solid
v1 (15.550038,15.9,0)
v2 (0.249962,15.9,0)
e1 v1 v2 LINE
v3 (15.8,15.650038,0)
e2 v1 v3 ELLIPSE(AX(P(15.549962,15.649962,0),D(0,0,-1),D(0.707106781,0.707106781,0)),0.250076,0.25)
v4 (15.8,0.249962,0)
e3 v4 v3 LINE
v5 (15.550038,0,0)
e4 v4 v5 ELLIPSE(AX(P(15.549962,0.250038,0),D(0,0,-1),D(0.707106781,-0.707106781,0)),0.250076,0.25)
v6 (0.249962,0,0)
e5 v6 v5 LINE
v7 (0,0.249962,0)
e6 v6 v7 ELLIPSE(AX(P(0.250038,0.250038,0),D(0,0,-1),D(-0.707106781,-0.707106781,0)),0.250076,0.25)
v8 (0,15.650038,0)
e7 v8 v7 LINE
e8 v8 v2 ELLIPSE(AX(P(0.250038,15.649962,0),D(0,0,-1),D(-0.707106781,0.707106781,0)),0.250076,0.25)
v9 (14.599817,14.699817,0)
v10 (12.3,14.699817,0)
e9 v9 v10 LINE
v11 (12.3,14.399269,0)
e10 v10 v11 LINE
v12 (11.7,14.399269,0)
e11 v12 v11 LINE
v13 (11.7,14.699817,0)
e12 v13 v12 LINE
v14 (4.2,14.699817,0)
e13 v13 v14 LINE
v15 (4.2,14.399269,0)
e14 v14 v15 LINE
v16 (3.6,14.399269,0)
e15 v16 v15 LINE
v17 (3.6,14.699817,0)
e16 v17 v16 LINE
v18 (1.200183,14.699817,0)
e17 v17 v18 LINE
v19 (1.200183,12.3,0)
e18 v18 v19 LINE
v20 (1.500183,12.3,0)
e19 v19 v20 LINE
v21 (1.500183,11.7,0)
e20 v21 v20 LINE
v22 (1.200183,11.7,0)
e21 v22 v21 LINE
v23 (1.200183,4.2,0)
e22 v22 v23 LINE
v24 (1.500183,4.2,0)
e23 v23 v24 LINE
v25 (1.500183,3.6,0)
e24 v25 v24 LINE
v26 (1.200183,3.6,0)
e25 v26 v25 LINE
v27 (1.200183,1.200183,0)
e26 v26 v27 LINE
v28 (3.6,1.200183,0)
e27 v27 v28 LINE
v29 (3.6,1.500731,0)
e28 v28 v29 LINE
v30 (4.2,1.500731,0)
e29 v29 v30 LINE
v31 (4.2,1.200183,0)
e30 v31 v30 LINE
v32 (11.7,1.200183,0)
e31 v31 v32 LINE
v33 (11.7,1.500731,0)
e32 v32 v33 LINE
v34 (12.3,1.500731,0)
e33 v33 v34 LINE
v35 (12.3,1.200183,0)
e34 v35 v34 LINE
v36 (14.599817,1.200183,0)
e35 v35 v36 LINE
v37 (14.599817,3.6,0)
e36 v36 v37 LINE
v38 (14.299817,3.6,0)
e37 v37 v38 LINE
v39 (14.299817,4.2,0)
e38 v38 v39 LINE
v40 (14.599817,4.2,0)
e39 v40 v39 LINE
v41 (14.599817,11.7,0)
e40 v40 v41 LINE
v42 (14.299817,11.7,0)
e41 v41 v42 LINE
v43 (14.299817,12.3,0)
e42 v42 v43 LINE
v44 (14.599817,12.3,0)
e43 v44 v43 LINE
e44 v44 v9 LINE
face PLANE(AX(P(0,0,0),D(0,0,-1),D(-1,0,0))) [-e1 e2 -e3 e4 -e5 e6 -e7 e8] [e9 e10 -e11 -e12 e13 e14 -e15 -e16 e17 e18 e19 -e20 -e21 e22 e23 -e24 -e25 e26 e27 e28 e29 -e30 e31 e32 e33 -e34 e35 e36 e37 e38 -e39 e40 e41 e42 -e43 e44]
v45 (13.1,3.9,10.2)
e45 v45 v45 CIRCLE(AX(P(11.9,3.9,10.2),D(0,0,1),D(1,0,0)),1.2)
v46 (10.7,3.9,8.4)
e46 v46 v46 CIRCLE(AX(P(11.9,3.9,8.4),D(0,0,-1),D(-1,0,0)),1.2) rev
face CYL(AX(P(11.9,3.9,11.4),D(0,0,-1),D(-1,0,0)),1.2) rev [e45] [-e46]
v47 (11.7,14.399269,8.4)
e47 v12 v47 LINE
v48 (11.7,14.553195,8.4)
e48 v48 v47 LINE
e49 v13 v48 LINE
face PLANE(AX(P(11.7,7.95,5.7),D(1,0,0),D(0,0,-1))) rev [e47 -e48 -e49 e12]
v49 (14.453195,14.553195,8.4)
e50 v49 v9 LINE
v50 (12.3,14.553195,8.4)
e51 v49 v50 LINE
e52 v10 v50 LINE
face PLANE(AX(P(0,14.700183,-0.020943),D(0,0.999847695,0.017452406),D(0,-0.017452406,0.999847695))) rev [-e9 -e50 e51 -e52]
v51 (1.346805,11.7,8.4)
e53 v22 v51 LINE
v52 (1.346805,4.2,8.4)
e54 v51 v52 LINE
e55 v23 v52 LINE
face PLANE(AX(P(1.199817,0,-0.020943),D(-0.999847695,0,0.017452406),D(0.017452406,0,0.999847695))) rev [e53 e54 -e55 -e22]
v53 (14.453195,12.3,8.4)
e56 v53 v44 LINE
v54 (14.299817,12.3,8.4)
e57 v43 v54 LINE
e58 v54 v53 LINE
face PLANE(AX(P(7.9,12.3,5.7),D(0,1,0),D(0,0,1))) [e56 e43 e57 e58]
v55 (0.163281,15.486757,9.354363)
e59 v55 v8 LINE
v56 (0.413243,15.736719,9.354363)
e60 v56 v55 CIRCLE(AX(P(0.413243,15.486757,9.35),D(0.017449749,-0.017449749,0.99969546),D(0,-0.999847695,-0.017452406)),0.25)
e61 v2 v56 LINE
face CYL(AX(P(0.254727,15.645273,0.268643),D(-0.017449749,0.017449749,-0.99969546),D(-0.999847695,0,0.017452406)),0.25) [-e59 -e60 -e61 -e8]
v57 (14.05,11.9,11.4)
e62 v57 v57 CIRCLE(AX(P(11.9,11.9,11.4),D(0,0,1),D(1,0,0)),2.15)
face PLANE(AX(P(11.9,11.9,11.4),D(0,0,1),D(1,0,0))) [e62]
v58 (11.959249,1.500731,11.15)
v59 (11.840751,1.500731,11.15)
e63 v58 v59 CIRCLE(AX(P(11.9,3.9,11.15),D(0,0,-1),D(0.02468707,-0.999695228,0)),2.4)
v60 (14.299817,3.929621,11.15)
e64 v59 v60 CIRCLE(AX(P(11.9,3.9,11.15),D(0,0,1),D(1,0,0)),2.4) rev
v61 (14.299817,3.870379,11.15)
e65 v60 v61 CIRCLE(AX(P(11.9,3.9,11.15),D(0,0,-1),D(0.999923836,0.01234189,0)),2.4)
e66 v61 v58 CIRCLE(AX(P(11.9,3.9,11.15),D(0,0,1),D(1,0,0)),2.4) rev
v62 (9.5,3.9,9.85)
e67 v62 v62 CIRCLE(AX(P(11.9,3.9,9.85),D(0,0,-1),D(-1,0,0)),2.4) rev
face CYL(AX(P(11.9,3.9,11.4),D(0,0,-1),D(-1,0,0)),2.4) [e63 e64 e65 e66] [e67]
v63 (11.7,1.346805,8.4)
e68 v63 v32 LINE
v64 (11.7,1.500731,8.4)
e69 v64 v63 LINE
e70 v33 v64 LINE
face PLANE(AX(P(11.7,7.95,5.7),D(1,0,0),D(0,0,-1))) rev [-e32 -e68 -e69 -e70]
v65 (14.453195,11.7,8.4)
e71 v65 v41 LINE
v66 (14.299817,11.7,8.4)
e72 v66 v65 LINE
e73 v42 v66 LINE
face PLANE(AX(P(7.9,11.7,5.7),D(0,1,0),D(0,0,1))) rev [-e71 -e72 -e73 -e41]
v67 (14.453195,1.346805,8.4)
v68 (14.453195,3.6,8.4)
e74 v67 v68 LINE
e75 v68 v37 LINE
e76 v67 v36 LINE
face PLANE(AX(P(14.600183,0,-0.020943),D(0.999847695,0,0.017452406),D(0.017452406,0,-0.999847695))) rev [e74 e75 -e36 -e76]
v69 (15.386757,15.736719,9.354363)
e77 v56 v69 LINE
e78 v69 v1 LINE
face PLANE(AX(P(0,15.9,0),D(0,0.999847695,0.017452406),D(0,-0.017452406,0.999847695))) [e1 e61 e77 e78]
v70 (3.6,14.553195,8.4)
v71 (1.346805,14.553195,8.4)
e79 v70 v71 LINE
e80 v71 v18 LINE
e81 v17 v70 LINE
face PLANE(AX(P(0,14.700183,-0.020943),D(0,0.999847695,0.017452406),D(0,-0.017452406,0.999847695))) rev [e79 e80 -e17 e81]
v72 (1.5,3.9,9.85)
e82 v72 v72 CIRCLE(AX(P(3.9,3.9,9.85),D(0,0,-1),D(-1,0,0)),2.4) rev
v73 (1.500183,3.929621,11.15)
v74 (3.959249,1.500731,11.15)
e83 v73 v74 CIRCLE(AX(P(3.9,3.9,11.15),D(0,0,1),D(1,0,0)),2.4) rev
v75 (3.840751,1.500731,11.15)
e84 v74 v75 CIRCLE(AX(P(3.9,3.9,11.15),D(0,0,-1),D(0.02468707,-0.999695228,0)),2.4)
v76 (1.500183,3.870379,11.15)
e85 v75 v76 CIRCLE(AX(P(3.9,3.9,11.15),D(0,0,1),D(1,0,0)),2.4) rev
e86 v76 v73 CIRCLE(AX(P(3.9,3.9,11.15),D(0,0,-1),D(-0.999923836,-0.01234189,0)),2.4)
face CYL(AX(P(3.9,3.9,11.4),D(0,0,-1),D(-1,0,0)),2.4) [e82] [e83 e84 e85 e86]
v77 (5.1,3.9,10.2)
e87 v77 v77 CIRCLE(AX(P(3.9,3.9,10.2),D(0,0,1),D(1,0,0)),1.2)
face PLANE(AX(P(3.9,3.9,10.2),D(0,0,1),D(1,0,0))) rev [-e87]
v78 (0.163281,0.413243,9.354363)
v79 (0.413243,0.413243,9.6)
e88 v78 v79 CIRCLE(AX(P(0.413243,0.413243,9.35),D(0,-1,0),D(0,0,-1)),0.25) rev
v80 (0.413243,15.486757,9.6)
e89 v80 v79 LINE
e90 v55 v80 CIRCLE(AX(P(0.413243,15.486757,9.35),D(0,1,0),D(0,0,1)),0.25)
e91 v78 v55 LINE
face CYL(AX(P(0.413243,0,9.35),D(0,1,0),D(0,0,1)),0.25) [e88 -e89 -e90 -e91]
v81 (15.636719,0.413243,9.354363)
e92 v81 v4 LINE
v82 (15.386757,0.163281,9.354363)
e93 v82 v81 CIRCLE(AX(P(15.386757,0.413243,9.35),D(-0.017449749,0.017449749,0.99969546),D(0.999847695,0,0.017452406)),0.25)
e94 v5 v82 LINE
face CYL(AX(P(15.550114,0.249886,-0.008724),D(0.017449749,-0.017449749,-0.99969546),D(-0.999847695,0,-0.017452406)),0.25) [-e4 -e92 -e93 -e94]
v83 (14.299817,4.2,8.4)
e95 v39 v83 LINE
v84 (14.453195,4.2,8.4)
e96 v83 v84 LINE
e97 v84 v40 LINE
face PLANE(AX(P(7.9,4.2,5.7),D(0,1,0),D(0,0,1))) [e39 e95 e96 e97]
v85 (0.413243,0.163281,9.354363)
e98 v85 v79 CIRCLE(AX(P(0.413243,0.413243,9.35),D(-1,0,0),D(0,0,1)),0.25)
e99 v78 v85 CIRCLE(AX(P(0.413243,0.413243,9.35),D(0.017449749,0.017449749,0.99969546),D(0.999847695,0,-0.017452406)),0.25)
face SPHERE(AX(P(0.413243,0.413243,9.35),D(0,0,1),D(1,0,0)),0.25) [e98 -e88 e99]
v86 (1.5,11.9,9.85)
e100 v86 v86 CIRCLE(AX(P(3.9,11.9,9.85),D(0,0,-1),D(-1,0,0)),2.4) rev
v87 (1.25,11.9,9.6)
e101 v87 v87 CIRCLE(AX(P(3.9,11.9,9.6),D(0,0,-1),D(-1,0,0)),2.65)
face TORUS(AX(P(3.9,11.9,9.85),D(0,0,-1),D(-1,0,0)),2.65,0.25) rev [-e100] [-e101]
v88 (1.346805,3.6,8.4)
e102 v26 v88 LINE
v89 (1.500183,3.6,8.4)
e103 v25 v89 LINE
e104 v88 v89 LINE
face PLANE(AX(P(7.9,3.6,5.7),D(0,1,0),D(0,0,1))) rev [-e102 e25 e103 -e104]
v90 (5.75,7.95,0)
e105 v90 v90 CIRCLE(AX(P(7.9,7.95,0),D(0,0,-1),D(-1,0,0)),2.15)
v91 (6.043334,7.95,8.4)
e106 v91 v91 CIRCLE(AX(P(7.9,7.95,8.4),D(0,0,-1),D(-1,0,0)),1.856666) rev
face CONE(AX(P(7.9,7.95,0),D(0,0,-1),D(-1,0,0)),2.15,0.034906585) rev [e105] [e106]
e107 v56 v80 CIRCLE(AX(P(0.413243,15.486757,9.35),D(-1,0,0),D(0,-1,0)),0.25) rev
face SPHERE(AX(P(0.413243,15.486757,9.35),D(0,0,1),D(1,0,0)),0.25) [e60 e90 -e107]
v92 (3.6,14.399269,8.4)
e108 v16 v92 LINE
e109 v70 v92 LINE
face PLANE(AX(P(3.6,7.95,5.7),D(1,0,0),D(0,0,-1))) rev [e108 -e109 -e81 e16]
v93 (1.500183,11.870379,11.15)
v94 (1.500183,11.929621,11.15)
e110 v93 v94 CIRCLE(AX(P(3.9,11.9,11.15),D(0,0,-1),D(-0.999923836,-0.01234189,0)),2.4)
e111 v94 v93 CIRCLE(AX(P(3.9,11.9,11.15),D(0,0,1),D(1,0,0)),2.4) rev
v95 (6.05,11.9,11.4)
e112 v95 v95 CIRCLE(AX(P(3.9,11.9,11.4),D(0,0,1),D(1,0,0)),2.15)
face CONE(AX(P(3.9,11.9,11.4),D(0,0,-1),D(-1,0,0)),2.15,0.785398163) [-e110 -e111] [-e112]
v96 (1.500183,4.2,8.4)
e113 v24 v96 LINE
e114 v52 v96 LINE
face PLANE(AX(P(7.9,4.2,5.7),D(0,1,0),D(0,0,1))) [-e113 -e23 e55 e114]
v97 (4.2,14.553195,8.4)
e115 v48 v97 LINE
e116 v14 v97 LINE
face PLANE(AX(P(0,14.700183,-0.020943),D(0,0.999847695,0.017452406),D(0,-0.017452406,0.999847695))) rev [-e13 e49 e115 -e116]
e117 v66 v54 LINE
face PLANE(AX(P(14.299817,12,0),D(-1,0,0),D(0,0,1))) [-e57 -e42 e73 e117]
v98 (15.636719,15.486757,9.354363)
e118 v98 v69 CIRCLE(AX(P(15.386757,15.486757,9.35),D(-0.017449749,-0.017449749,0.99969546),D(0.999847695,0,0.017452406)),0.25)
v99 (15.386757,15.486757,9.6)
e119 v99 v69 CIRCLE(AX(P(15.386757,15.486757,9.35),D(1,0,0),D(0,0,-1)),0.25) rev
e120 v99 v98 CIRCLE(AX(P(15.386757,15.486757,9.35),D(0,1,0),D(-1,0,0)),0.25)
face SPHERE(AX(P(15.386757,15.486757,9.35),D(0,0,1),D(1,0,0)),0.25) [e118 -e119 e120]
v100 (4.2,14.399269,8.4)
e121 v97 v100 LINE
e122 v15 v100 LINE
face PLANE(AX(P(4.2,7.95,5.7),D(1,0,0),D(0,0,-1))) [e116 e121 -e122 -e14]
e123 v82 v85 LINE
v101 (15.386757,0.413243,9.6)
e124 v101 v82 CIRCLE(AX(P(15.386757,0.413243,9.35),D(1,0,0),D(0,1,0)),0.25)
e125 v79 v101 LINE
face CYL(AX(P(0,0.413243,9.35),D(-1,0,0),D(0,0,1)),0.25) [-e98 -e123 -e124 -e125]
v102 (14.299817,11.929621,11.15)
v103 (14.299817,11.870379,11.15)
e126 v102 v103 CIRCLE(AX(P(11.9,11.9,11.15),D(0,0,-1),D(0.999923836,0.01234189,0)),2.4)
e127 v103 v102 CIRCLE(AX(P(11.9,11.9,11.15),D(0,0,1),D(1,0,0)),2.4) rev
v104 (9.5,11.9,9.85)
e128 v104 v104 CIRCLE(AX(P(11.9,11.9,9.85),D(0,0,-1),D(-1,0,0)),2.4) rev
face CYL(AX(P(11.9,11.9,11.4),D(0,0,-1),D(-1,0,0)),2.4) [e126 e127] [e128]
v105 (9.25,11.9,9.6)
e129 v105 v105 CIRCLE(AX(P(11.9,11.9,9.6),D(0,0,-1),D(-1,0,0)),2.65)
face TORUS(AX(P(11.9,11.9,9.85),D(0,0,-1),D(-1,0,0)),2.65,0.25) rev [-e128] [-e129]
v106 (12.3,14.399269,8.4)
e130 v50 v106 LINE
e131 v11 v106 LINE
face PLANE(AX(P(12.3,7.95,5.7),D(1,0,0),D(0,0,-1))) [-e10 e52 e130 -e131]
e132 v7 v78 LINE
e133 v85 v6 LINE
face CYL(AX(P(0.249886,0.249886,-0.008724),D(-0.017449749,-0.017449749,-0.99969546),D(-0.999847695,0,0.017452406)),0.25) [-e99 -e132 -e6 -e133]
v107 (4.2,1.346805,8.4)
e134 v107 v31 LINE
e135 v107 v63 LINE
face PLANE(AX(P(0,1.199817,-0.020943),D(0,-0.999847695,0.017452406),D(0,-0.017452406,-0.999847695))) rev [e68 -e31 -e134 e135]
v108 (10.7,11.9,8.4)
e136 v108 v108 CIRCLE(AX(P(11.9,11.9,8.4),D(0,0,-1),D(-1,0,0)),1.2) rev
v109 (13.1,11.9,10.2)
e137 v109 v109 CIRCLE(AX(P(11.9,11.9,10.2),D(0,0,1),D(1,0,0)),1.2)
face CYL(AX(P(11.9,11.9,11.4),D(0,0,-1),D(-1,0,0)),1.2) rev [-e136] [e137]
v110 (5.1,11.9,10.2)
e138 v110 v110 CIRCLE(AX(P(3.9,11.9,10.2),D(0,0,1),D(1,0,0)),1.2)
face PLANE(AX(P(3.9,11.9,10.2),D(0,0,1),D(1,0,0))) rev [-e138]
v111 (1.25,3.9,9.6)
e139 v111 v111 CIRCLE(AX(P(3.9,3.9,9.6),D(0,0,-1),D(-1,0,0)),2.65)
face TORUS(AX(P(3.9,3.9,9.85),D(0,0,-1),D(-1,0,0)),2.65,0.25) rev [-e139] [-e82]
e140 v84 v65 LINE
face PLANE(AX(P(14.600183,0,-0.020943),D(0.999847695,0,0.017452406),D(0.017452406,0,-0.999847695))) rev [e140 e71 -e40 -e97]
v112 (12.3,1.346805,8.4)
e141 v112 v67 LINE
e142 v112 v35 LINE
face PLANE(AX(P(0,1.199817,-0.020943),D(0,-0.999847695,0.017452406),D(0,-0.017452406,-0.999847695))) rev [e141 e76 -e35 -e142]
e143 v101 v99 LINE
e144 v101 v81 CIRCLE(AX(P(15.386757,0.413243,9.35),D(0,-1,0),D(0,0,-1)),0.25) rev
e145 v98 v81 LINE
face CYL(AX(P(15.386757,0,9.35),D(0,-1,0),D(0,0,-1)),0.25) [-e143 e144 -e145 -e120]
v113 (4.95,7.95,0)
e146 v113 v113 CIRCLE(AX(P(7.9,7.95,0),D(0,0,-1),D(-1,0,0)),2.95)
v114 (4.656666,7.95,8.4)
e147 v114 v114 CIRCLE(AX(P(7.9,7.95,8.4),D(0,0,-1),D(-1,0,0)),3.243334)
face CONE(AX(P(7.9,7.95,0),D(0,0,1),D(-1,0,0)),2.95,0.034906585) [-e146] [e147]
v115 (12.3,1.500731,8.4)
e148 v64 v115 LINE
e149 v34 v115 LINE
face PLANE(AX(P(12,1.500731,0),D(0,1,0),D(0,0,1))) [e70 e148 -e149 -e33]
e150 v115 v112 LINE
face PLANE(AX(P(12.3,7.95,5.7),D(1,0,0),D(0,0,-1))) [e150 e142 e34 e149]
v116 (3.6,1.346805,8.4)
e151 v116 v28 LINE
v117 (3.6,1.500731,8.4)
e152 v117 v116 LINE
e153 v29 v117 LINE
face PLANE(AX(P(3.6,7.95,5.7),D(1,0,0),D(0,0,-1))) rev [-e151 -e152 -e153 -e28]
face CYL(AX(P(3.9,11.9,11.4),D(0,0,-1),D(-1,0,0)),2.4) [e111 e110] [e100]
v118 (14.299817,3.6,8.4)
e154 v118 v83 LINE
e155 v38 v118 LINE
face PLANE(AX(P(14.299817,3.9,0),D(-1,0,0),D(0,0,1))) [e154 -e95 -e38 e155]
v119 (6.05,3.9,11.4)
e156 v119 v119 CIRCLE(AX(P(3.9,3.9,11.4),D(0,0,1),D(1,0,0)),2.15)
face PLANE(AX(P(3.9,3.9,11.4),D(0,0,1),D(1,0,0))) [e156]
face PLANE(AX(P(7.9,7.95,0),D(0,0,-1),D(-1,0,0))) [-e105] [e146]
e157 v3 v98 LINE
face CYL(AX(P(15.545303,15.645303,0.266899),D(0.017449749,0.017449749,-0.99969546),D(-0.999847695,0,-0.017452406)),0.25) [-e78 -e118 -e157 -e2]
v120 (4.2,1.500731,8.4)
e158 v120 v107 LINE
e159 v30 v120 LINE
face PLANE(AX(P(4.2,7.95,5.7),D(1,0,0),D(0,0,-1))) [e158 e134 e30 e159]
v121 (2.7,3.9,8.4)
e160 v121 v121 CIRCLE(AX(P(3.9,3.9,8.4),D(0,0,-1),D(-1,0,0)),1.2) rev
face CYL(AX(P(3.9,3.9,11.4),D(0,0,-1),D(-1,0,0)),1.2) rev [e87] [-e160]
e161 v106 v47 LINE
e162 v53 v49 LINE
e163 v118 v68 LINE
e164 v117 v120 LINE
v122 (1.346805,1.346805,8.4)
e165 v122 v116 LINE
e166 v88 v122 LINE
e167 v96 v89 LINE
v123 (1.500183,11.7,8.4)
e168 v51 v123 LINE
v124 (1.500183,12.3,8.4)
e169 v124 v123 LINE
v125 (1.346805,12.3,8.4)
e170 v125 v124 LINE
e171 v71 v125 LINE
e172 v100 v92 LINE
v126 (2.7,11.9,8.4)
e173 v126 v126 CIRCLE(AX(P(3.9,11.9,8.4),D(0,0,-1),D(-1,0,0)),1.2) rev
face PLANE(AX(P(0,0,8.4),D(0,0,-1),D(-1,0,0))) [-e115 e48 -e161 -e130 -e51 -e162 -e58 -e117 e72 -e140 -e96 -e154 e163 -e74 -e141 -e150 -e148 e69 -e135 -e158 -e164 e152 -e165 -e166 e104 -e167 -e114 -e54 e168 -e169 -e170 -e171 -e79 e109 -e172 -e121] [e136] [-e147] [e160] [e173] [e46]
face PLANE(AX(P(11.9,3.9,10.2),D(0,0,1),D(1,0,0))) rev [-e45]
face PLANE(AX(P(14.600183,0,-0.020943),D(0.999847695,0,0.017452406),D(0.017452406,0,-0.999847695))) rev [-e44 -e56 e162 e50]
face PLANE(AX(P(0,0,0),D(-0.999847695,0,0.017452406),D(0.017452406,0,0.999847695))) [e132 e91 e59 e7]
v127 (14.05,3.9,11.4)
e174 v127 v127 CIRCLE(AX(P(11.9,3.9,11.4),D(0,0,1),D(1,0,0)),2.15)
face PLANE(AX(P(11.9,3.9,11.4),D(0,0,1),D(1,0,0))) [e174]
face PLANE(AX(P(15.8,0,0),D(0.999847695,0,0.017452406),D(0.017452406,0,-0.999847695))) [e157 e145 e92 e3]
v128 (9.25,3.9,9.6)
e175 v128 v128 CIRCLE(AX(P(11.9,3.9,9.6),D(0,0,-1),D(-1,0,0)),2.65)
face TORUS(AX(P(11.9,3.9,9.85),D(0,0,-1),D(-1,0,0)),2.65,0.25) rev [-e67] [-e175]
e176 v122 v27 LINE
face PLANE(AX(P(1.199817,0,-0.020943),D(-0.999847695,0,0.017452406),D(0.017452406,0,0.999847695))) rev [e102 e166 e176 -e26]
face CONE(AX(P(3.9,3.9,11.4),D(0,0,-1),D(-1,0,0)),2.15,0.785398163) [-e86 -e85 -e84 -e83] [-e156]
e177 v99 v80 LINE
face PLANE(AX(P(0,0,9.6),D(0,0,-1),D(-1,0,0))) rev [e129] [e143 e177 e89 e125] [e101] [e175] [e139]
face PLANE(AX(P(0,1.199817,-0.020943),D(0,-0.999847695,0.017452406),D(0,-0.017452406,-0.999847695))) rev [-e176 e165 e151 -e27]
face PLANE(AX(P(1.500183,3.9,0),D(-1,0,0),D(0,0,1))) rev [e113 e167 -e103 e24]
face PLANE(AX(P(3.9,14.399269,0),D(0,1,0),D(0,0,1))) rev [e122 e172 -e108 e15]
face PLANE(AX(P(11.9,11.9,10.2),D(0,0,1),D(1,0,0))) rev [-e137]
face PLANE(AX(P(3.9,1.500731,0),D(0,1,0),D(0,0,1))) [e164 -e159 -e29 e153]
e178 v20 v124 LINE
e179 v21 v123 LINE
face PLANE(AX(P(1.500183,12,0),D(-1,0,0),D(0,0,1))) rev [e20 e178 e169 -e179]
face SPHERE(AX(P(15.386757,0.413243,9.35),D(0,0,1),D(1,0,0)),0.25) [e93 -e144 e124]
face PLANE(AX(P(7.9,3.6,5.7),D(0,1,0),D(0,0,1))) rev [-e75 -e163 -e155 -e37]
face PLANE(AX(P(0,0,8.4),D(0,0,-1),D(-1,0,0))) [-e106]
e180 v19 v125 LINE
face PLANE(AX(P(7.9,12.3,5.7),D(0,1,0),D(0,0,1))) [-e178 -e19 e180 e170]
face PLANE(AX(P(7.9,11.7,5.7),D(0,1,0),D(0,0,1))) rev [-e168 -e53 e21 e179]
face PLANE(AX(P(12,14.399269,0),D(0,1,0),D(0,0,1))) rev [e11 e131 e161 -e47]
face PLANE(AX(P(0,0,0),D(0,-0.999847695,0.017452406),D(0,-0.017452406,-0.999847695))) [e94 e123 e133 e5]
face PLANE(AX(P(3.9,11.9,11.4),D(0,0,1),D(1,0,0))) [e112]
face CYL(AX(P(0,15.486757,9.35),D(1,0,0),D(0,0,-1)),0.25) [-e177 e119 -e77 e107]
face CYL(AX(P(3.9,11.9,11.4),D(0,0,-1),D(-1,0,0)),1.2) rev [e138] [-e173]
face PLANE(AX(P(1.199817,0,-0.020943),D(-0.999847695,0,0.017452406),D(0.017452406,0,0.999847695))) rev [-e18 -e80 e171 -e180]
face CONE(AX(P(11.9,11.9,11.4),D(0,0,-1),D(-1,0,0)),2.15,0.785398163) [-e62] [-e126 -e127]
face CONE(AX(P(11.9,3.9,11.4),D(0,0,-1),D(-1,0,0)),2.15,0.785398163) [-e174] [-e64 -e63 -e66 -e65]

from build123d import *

# Parameters (mm, degrees)
SKETCH1_W                  = 15.8
SKETCH1_H                  = 15.9
BOSS_EXTRUDE1_DEPTH        = 9.6
BOSS_EXTRUDE1_TAPER        = 1
SKETCH2_R                  = 2.4
BOSS_EXTRUDE2_DEPTH        = 1.8
CHAMFER1_SIZE              = 0.25
LPATTERN1_COUNT            = 2
LPATTERN1_PITCH            = 8
LPATTERN1_COUNT_DIR2       = 2
LPATTERN1_PITCH_DIR2       = 8
CHAMFER1_OF_LPATTERN1_SIZE = 0.25
SHELL1_OUTLINE_R           = 1.2
SHELL1_DEPTH               = 10.2
FILLET1_R                  = 0.25
RIB2_START                 = -0.3
RIB2_DEPTH                 = 0.6
RIB3_START                 = -0.3
RIB3_DEPTH                 = 0.6
LPATTERN2_COUNT            = 2
LPATTERN2_PITCH            = 8.1
LPATTERN3_COUNT            = 2
LPATTERN3_PITCH            = 8.1
MIRROR1_START              = -0.3
MIRROR1_COPY_1_DEPTH       = 0.6
MIRROR2_START              = -0.3
MIRROR2_COPY_1_DEPTH       = 0.6
SKETCH5_R                  = 2.95
SKETCH5_R_2                = 2.15
BOSS_EXTRUDE3_DEPTH        = 8.4
BOSS_EXTRUDE3_DRAFT        = 2


with BuildPart() as part:
    # Sketch1 → Boss-Extrude1 (new body)
    with BuildSketch(Plane.XY):
        with Locations((7.9, 7.95)):
            Rectangle(SKETCH1_W, SKETCH1_H)
    extrude(amount=BOSS_EXTRUDE1_DEPTH, taper=BOSS_EXTRUDE1_TAPER)

    # Sketch2 → Boss-Extrude2 (add)
    with BuildSketch(Plane.XY.offset(9.6)):
        with Locations(Location((3.9, 3.9, 0), (0, 0, 180))):
            Circle(SKETCH2_R)
    boss_extrude2 = extrude(amount=BOSS_EXTRUDE2_DEPTH)

    # Chamfer1
    chamfer1_edges = [part.edges().sort_by_distance(p)[0] for p in [
        (6.3, 3.9, 11.4),
    ]]
    chamfer(chamfer1_edges, length=CHAMFER1_SIZE)

    # LPattern1: Boss-Extrude2 2 × 2
    with Locations(*[(j * LPATTERN1_PITCH_DIR2, i * LPATTERN1_PITCH, 0) for i in range(LPATTERN1_COUNT) for j in range(LPATTERN1_COUNT_DIR2) if (i, j) != (0, 0)]):
        add(boss_extrude2)

    # Chamfer1 of LPattern1
    chamfer1_of_lpattern1_edges = [part.edges().sort_by_distance(p)[0] for p in [
        (14.3, 3.9, 11.4),
        (6.3, 11.9, 11.4),
        (14.3, 11.9, 11.4),
    ]]
    chamfer(chamfer1_of_lpattern1_edges, length=CHAMFER1_OF_LPATTERN1_SIZE)

    # Shell1: read off the stored shape, not the designer's step
    # Shell1 outline → Shell1 (cut)
    with BuildSketch(Plane.XY):
        with Locations((11.9, 11.9)):
            Circle(SHELL1_OUTLINE_R)
        with Locations((11.9, 3.9)):
            Circle(SHELL1_OUTLINE_R)
        with Locations((3.9, 3.9)):
            Circle(SHELL1_OUTLINE_R)
        with Locations((3.9, 11.9)):
            Circle(SHELL1_OUTLINE_R)
    extrude(amount=SHELL1_DEPTH, mode=Mode.SUBTRACT)

    # Shell1 2: loft between two sections, ruled curve by curve
    shell1_2_from = [
        Edge.make_line((1.346805339, 14.553194661, 8.4), (1.346805339, 1.346805339, 8.4)),
        Edge.make_line((1.346805339, 1.346805339, 8.4), (14.453194661, 1.346805339, 8.4)),
        Edge.make_line((14.453194661, 1.346805339, 8.4), (14.453194661, 14.553194661, 8.4)),
        Edge.make_line((14.453194661, 14.553194661, 8.4), (1.346805339, 14.553194661, 8.4)),
    ]
    shell1_2_to = [
        Edge.make_line((1.200182794, 14.699817206, 0), (1.200182794, 1.200182794, 0)),
        Edge.make_line((1.200182794, 1.200182794, 0), (14.599817206, 1.200182794, 0)),
        Edge.make_line((14.599817206, 1.200182794, 0), (14.599817206, 14.699817206, 0)),
        Edge.make_line((14.599817206, 14.699817206, 0), (1.200182794, 14.699817206, 0)),
    ]
    shell1_2 = Solid(Shell([*[Face.make_surface_from_curves(shell1_2_from[k], shell1_2_to[k]) for k in range(4)], Face(Wire(shell1_2_from)), Face(Wire(shell1_2_to))]))
    add(shell1_2, mode=Mode.SUBTRACT)

    # Fillet1
    fillet1_edges = [part.edges().sort_by_distance(p)[0] for p in [
        (15.632431377, 7.95, 9.6),
        (6.3, 3.9, 9.6),
        (7.9, 15.732431377, 9.6),
        (6.3, 11.9, 9.6),
        (14.3, 3.9, 9.6),
        (14.3, 11.9, 9.6),
        (0.167568623, 7.95, 9.6),
        (0.083784312, 15.816215688, 4.8),
        (15.716215688, 15.816215688, 4.8),
        (15.716215688, 0.083784312, 4.8),
        (0.083784312, 0.083784312, 4.8),
        (7.9, 0.167568623, 9.6),
    ]]
    fillet(fillet1_edges, radius=FILLET1_R)

    # Rib2: read off the stored shape, not the designer's step
    # Rib2 outline → Rib2 (add)
    with BuildSketch(Plane(origin=(0, 3.9, 0), x_dir=(1, 0, 0), z_dir=(0, 1, 0)).offset(RIB2_START)):
        Polygon((14.599817206, 0), (14.299817206, 0), (14.299817206, -8.4), (14.453194661, -8.4), align=None)
    rib2 = extrude(amount=RIB2_DEPTH)

    # Rib3: read off the stored shape, not the designer's step
    # Rib3 outline → Rib3 (add)
    with BuildSketch(Plane(origin=(3.9, 0, 0), x_dir=(0, 0, -1), z_dir=(1, 0, 0)).offset(RIB3_START)):
        Polygon((0, 1.200182794), (0, 1.500731453), (-8.4, 1.500731453), (-8.4, 1.346805339), align=None)
    rib3 = extrude(amount=RIB3_DEPTH)

    # LPattern2: Rib2 ×2
    with Locations(*[(0, i * LPATTERN2_PITCH, 0) for i in range(1, LPATTERN2_COUNT)]):
        add(rib2)

    # LPattern3: Rib3 ×2
    with Locations(*[(i * LPATTERN3_PITCH, 0, 0) for i in range(1, LPATTERN3_COUNT)]):
        add(rib3)

    # Mirror1: Rib3 across plane
    add(rib3.mirror(Plane.ZX.offset(7.95)))

    # Mirror1 copy 1 sketch → Mirror1 copy 1 (add)
    with BuildSketch(Plane(origin=(12, 15.9, 0), x_dir=(0, 0, -1), z_dir=(1, 0, 0)).offset(MIRROR1_START)):
        Polygon((0, -1.200182794), (0, -1.500731453), (-8.4, -1.500731453), (-8.4, -1.346805339), align=None)
    extrude(amount=MIRROR1_COPY_1_DEPTH)

    # Mirror2: Rib2 across plane
    add(rib2.mirror(Plane(origin=(7.9, 0, 0), x_dir=(0, 0, 1), z_dir=(1, 0, 0))))

    # Mirror2 copy 1 sketch → Mirror2 copy 1 (add)
    with BuildSketch(Plane(origin=(15.8, 12, 0), x_dir=(-1, 0, 0), z_dir=(0, 1, 0)).offset(MIRROR2_START)):
        Polygon((14.599817206, 0), (14.299817206, 0), (14.299817206, 8.4), (14.453194661, 8.4), align=None)
    extrude(amount=MIRROR2_COPY_1_DEPTH)


with BuildPart() as boss_extrude3_tool:
    # Sketch5 → Boss-Extrude3 (with draft: the straight prism first)
    with BuildSketch(Plane(origin=(0, 0, 0), x_dir=(-1, 0, 0), z_dir=(0, 0, -1))):
        with Locations((-7.9, 7.95)):
            Circle(SKETCH5_R)
        with Locations((-7.9, 7.95)):
            Circle(SKETCH5_R_2, mode=Mode.SUBTRACT)
    extrude(amount=-BOSS_EXTRUDE3_DEPTH)
    # Boss-Extrude3: the draft: its side faces are tilted about the plane it starts from
    boss_extrude3_sides = [boss_extrude3_tool.faces().sort_by_distance(p)[0] for p in [
        (10.85, 7.95, 4.2),
        (10.05, 7.95, 4.2),
    ]]
    draft(boss_extrude3_sides, Plane(origin=(0, 0, 0), x_dir=(-1, 0, 0), z_dir=(0, 0, -1)), BOSS_EXTRUDE3_DRAFT)


with BuildPart() as part_1:
    add(part.part)

    # Boss-Extrude3: add boss_extrude3_tool
    add(boss_extrude3_tool.part)


solid = part_1.part
